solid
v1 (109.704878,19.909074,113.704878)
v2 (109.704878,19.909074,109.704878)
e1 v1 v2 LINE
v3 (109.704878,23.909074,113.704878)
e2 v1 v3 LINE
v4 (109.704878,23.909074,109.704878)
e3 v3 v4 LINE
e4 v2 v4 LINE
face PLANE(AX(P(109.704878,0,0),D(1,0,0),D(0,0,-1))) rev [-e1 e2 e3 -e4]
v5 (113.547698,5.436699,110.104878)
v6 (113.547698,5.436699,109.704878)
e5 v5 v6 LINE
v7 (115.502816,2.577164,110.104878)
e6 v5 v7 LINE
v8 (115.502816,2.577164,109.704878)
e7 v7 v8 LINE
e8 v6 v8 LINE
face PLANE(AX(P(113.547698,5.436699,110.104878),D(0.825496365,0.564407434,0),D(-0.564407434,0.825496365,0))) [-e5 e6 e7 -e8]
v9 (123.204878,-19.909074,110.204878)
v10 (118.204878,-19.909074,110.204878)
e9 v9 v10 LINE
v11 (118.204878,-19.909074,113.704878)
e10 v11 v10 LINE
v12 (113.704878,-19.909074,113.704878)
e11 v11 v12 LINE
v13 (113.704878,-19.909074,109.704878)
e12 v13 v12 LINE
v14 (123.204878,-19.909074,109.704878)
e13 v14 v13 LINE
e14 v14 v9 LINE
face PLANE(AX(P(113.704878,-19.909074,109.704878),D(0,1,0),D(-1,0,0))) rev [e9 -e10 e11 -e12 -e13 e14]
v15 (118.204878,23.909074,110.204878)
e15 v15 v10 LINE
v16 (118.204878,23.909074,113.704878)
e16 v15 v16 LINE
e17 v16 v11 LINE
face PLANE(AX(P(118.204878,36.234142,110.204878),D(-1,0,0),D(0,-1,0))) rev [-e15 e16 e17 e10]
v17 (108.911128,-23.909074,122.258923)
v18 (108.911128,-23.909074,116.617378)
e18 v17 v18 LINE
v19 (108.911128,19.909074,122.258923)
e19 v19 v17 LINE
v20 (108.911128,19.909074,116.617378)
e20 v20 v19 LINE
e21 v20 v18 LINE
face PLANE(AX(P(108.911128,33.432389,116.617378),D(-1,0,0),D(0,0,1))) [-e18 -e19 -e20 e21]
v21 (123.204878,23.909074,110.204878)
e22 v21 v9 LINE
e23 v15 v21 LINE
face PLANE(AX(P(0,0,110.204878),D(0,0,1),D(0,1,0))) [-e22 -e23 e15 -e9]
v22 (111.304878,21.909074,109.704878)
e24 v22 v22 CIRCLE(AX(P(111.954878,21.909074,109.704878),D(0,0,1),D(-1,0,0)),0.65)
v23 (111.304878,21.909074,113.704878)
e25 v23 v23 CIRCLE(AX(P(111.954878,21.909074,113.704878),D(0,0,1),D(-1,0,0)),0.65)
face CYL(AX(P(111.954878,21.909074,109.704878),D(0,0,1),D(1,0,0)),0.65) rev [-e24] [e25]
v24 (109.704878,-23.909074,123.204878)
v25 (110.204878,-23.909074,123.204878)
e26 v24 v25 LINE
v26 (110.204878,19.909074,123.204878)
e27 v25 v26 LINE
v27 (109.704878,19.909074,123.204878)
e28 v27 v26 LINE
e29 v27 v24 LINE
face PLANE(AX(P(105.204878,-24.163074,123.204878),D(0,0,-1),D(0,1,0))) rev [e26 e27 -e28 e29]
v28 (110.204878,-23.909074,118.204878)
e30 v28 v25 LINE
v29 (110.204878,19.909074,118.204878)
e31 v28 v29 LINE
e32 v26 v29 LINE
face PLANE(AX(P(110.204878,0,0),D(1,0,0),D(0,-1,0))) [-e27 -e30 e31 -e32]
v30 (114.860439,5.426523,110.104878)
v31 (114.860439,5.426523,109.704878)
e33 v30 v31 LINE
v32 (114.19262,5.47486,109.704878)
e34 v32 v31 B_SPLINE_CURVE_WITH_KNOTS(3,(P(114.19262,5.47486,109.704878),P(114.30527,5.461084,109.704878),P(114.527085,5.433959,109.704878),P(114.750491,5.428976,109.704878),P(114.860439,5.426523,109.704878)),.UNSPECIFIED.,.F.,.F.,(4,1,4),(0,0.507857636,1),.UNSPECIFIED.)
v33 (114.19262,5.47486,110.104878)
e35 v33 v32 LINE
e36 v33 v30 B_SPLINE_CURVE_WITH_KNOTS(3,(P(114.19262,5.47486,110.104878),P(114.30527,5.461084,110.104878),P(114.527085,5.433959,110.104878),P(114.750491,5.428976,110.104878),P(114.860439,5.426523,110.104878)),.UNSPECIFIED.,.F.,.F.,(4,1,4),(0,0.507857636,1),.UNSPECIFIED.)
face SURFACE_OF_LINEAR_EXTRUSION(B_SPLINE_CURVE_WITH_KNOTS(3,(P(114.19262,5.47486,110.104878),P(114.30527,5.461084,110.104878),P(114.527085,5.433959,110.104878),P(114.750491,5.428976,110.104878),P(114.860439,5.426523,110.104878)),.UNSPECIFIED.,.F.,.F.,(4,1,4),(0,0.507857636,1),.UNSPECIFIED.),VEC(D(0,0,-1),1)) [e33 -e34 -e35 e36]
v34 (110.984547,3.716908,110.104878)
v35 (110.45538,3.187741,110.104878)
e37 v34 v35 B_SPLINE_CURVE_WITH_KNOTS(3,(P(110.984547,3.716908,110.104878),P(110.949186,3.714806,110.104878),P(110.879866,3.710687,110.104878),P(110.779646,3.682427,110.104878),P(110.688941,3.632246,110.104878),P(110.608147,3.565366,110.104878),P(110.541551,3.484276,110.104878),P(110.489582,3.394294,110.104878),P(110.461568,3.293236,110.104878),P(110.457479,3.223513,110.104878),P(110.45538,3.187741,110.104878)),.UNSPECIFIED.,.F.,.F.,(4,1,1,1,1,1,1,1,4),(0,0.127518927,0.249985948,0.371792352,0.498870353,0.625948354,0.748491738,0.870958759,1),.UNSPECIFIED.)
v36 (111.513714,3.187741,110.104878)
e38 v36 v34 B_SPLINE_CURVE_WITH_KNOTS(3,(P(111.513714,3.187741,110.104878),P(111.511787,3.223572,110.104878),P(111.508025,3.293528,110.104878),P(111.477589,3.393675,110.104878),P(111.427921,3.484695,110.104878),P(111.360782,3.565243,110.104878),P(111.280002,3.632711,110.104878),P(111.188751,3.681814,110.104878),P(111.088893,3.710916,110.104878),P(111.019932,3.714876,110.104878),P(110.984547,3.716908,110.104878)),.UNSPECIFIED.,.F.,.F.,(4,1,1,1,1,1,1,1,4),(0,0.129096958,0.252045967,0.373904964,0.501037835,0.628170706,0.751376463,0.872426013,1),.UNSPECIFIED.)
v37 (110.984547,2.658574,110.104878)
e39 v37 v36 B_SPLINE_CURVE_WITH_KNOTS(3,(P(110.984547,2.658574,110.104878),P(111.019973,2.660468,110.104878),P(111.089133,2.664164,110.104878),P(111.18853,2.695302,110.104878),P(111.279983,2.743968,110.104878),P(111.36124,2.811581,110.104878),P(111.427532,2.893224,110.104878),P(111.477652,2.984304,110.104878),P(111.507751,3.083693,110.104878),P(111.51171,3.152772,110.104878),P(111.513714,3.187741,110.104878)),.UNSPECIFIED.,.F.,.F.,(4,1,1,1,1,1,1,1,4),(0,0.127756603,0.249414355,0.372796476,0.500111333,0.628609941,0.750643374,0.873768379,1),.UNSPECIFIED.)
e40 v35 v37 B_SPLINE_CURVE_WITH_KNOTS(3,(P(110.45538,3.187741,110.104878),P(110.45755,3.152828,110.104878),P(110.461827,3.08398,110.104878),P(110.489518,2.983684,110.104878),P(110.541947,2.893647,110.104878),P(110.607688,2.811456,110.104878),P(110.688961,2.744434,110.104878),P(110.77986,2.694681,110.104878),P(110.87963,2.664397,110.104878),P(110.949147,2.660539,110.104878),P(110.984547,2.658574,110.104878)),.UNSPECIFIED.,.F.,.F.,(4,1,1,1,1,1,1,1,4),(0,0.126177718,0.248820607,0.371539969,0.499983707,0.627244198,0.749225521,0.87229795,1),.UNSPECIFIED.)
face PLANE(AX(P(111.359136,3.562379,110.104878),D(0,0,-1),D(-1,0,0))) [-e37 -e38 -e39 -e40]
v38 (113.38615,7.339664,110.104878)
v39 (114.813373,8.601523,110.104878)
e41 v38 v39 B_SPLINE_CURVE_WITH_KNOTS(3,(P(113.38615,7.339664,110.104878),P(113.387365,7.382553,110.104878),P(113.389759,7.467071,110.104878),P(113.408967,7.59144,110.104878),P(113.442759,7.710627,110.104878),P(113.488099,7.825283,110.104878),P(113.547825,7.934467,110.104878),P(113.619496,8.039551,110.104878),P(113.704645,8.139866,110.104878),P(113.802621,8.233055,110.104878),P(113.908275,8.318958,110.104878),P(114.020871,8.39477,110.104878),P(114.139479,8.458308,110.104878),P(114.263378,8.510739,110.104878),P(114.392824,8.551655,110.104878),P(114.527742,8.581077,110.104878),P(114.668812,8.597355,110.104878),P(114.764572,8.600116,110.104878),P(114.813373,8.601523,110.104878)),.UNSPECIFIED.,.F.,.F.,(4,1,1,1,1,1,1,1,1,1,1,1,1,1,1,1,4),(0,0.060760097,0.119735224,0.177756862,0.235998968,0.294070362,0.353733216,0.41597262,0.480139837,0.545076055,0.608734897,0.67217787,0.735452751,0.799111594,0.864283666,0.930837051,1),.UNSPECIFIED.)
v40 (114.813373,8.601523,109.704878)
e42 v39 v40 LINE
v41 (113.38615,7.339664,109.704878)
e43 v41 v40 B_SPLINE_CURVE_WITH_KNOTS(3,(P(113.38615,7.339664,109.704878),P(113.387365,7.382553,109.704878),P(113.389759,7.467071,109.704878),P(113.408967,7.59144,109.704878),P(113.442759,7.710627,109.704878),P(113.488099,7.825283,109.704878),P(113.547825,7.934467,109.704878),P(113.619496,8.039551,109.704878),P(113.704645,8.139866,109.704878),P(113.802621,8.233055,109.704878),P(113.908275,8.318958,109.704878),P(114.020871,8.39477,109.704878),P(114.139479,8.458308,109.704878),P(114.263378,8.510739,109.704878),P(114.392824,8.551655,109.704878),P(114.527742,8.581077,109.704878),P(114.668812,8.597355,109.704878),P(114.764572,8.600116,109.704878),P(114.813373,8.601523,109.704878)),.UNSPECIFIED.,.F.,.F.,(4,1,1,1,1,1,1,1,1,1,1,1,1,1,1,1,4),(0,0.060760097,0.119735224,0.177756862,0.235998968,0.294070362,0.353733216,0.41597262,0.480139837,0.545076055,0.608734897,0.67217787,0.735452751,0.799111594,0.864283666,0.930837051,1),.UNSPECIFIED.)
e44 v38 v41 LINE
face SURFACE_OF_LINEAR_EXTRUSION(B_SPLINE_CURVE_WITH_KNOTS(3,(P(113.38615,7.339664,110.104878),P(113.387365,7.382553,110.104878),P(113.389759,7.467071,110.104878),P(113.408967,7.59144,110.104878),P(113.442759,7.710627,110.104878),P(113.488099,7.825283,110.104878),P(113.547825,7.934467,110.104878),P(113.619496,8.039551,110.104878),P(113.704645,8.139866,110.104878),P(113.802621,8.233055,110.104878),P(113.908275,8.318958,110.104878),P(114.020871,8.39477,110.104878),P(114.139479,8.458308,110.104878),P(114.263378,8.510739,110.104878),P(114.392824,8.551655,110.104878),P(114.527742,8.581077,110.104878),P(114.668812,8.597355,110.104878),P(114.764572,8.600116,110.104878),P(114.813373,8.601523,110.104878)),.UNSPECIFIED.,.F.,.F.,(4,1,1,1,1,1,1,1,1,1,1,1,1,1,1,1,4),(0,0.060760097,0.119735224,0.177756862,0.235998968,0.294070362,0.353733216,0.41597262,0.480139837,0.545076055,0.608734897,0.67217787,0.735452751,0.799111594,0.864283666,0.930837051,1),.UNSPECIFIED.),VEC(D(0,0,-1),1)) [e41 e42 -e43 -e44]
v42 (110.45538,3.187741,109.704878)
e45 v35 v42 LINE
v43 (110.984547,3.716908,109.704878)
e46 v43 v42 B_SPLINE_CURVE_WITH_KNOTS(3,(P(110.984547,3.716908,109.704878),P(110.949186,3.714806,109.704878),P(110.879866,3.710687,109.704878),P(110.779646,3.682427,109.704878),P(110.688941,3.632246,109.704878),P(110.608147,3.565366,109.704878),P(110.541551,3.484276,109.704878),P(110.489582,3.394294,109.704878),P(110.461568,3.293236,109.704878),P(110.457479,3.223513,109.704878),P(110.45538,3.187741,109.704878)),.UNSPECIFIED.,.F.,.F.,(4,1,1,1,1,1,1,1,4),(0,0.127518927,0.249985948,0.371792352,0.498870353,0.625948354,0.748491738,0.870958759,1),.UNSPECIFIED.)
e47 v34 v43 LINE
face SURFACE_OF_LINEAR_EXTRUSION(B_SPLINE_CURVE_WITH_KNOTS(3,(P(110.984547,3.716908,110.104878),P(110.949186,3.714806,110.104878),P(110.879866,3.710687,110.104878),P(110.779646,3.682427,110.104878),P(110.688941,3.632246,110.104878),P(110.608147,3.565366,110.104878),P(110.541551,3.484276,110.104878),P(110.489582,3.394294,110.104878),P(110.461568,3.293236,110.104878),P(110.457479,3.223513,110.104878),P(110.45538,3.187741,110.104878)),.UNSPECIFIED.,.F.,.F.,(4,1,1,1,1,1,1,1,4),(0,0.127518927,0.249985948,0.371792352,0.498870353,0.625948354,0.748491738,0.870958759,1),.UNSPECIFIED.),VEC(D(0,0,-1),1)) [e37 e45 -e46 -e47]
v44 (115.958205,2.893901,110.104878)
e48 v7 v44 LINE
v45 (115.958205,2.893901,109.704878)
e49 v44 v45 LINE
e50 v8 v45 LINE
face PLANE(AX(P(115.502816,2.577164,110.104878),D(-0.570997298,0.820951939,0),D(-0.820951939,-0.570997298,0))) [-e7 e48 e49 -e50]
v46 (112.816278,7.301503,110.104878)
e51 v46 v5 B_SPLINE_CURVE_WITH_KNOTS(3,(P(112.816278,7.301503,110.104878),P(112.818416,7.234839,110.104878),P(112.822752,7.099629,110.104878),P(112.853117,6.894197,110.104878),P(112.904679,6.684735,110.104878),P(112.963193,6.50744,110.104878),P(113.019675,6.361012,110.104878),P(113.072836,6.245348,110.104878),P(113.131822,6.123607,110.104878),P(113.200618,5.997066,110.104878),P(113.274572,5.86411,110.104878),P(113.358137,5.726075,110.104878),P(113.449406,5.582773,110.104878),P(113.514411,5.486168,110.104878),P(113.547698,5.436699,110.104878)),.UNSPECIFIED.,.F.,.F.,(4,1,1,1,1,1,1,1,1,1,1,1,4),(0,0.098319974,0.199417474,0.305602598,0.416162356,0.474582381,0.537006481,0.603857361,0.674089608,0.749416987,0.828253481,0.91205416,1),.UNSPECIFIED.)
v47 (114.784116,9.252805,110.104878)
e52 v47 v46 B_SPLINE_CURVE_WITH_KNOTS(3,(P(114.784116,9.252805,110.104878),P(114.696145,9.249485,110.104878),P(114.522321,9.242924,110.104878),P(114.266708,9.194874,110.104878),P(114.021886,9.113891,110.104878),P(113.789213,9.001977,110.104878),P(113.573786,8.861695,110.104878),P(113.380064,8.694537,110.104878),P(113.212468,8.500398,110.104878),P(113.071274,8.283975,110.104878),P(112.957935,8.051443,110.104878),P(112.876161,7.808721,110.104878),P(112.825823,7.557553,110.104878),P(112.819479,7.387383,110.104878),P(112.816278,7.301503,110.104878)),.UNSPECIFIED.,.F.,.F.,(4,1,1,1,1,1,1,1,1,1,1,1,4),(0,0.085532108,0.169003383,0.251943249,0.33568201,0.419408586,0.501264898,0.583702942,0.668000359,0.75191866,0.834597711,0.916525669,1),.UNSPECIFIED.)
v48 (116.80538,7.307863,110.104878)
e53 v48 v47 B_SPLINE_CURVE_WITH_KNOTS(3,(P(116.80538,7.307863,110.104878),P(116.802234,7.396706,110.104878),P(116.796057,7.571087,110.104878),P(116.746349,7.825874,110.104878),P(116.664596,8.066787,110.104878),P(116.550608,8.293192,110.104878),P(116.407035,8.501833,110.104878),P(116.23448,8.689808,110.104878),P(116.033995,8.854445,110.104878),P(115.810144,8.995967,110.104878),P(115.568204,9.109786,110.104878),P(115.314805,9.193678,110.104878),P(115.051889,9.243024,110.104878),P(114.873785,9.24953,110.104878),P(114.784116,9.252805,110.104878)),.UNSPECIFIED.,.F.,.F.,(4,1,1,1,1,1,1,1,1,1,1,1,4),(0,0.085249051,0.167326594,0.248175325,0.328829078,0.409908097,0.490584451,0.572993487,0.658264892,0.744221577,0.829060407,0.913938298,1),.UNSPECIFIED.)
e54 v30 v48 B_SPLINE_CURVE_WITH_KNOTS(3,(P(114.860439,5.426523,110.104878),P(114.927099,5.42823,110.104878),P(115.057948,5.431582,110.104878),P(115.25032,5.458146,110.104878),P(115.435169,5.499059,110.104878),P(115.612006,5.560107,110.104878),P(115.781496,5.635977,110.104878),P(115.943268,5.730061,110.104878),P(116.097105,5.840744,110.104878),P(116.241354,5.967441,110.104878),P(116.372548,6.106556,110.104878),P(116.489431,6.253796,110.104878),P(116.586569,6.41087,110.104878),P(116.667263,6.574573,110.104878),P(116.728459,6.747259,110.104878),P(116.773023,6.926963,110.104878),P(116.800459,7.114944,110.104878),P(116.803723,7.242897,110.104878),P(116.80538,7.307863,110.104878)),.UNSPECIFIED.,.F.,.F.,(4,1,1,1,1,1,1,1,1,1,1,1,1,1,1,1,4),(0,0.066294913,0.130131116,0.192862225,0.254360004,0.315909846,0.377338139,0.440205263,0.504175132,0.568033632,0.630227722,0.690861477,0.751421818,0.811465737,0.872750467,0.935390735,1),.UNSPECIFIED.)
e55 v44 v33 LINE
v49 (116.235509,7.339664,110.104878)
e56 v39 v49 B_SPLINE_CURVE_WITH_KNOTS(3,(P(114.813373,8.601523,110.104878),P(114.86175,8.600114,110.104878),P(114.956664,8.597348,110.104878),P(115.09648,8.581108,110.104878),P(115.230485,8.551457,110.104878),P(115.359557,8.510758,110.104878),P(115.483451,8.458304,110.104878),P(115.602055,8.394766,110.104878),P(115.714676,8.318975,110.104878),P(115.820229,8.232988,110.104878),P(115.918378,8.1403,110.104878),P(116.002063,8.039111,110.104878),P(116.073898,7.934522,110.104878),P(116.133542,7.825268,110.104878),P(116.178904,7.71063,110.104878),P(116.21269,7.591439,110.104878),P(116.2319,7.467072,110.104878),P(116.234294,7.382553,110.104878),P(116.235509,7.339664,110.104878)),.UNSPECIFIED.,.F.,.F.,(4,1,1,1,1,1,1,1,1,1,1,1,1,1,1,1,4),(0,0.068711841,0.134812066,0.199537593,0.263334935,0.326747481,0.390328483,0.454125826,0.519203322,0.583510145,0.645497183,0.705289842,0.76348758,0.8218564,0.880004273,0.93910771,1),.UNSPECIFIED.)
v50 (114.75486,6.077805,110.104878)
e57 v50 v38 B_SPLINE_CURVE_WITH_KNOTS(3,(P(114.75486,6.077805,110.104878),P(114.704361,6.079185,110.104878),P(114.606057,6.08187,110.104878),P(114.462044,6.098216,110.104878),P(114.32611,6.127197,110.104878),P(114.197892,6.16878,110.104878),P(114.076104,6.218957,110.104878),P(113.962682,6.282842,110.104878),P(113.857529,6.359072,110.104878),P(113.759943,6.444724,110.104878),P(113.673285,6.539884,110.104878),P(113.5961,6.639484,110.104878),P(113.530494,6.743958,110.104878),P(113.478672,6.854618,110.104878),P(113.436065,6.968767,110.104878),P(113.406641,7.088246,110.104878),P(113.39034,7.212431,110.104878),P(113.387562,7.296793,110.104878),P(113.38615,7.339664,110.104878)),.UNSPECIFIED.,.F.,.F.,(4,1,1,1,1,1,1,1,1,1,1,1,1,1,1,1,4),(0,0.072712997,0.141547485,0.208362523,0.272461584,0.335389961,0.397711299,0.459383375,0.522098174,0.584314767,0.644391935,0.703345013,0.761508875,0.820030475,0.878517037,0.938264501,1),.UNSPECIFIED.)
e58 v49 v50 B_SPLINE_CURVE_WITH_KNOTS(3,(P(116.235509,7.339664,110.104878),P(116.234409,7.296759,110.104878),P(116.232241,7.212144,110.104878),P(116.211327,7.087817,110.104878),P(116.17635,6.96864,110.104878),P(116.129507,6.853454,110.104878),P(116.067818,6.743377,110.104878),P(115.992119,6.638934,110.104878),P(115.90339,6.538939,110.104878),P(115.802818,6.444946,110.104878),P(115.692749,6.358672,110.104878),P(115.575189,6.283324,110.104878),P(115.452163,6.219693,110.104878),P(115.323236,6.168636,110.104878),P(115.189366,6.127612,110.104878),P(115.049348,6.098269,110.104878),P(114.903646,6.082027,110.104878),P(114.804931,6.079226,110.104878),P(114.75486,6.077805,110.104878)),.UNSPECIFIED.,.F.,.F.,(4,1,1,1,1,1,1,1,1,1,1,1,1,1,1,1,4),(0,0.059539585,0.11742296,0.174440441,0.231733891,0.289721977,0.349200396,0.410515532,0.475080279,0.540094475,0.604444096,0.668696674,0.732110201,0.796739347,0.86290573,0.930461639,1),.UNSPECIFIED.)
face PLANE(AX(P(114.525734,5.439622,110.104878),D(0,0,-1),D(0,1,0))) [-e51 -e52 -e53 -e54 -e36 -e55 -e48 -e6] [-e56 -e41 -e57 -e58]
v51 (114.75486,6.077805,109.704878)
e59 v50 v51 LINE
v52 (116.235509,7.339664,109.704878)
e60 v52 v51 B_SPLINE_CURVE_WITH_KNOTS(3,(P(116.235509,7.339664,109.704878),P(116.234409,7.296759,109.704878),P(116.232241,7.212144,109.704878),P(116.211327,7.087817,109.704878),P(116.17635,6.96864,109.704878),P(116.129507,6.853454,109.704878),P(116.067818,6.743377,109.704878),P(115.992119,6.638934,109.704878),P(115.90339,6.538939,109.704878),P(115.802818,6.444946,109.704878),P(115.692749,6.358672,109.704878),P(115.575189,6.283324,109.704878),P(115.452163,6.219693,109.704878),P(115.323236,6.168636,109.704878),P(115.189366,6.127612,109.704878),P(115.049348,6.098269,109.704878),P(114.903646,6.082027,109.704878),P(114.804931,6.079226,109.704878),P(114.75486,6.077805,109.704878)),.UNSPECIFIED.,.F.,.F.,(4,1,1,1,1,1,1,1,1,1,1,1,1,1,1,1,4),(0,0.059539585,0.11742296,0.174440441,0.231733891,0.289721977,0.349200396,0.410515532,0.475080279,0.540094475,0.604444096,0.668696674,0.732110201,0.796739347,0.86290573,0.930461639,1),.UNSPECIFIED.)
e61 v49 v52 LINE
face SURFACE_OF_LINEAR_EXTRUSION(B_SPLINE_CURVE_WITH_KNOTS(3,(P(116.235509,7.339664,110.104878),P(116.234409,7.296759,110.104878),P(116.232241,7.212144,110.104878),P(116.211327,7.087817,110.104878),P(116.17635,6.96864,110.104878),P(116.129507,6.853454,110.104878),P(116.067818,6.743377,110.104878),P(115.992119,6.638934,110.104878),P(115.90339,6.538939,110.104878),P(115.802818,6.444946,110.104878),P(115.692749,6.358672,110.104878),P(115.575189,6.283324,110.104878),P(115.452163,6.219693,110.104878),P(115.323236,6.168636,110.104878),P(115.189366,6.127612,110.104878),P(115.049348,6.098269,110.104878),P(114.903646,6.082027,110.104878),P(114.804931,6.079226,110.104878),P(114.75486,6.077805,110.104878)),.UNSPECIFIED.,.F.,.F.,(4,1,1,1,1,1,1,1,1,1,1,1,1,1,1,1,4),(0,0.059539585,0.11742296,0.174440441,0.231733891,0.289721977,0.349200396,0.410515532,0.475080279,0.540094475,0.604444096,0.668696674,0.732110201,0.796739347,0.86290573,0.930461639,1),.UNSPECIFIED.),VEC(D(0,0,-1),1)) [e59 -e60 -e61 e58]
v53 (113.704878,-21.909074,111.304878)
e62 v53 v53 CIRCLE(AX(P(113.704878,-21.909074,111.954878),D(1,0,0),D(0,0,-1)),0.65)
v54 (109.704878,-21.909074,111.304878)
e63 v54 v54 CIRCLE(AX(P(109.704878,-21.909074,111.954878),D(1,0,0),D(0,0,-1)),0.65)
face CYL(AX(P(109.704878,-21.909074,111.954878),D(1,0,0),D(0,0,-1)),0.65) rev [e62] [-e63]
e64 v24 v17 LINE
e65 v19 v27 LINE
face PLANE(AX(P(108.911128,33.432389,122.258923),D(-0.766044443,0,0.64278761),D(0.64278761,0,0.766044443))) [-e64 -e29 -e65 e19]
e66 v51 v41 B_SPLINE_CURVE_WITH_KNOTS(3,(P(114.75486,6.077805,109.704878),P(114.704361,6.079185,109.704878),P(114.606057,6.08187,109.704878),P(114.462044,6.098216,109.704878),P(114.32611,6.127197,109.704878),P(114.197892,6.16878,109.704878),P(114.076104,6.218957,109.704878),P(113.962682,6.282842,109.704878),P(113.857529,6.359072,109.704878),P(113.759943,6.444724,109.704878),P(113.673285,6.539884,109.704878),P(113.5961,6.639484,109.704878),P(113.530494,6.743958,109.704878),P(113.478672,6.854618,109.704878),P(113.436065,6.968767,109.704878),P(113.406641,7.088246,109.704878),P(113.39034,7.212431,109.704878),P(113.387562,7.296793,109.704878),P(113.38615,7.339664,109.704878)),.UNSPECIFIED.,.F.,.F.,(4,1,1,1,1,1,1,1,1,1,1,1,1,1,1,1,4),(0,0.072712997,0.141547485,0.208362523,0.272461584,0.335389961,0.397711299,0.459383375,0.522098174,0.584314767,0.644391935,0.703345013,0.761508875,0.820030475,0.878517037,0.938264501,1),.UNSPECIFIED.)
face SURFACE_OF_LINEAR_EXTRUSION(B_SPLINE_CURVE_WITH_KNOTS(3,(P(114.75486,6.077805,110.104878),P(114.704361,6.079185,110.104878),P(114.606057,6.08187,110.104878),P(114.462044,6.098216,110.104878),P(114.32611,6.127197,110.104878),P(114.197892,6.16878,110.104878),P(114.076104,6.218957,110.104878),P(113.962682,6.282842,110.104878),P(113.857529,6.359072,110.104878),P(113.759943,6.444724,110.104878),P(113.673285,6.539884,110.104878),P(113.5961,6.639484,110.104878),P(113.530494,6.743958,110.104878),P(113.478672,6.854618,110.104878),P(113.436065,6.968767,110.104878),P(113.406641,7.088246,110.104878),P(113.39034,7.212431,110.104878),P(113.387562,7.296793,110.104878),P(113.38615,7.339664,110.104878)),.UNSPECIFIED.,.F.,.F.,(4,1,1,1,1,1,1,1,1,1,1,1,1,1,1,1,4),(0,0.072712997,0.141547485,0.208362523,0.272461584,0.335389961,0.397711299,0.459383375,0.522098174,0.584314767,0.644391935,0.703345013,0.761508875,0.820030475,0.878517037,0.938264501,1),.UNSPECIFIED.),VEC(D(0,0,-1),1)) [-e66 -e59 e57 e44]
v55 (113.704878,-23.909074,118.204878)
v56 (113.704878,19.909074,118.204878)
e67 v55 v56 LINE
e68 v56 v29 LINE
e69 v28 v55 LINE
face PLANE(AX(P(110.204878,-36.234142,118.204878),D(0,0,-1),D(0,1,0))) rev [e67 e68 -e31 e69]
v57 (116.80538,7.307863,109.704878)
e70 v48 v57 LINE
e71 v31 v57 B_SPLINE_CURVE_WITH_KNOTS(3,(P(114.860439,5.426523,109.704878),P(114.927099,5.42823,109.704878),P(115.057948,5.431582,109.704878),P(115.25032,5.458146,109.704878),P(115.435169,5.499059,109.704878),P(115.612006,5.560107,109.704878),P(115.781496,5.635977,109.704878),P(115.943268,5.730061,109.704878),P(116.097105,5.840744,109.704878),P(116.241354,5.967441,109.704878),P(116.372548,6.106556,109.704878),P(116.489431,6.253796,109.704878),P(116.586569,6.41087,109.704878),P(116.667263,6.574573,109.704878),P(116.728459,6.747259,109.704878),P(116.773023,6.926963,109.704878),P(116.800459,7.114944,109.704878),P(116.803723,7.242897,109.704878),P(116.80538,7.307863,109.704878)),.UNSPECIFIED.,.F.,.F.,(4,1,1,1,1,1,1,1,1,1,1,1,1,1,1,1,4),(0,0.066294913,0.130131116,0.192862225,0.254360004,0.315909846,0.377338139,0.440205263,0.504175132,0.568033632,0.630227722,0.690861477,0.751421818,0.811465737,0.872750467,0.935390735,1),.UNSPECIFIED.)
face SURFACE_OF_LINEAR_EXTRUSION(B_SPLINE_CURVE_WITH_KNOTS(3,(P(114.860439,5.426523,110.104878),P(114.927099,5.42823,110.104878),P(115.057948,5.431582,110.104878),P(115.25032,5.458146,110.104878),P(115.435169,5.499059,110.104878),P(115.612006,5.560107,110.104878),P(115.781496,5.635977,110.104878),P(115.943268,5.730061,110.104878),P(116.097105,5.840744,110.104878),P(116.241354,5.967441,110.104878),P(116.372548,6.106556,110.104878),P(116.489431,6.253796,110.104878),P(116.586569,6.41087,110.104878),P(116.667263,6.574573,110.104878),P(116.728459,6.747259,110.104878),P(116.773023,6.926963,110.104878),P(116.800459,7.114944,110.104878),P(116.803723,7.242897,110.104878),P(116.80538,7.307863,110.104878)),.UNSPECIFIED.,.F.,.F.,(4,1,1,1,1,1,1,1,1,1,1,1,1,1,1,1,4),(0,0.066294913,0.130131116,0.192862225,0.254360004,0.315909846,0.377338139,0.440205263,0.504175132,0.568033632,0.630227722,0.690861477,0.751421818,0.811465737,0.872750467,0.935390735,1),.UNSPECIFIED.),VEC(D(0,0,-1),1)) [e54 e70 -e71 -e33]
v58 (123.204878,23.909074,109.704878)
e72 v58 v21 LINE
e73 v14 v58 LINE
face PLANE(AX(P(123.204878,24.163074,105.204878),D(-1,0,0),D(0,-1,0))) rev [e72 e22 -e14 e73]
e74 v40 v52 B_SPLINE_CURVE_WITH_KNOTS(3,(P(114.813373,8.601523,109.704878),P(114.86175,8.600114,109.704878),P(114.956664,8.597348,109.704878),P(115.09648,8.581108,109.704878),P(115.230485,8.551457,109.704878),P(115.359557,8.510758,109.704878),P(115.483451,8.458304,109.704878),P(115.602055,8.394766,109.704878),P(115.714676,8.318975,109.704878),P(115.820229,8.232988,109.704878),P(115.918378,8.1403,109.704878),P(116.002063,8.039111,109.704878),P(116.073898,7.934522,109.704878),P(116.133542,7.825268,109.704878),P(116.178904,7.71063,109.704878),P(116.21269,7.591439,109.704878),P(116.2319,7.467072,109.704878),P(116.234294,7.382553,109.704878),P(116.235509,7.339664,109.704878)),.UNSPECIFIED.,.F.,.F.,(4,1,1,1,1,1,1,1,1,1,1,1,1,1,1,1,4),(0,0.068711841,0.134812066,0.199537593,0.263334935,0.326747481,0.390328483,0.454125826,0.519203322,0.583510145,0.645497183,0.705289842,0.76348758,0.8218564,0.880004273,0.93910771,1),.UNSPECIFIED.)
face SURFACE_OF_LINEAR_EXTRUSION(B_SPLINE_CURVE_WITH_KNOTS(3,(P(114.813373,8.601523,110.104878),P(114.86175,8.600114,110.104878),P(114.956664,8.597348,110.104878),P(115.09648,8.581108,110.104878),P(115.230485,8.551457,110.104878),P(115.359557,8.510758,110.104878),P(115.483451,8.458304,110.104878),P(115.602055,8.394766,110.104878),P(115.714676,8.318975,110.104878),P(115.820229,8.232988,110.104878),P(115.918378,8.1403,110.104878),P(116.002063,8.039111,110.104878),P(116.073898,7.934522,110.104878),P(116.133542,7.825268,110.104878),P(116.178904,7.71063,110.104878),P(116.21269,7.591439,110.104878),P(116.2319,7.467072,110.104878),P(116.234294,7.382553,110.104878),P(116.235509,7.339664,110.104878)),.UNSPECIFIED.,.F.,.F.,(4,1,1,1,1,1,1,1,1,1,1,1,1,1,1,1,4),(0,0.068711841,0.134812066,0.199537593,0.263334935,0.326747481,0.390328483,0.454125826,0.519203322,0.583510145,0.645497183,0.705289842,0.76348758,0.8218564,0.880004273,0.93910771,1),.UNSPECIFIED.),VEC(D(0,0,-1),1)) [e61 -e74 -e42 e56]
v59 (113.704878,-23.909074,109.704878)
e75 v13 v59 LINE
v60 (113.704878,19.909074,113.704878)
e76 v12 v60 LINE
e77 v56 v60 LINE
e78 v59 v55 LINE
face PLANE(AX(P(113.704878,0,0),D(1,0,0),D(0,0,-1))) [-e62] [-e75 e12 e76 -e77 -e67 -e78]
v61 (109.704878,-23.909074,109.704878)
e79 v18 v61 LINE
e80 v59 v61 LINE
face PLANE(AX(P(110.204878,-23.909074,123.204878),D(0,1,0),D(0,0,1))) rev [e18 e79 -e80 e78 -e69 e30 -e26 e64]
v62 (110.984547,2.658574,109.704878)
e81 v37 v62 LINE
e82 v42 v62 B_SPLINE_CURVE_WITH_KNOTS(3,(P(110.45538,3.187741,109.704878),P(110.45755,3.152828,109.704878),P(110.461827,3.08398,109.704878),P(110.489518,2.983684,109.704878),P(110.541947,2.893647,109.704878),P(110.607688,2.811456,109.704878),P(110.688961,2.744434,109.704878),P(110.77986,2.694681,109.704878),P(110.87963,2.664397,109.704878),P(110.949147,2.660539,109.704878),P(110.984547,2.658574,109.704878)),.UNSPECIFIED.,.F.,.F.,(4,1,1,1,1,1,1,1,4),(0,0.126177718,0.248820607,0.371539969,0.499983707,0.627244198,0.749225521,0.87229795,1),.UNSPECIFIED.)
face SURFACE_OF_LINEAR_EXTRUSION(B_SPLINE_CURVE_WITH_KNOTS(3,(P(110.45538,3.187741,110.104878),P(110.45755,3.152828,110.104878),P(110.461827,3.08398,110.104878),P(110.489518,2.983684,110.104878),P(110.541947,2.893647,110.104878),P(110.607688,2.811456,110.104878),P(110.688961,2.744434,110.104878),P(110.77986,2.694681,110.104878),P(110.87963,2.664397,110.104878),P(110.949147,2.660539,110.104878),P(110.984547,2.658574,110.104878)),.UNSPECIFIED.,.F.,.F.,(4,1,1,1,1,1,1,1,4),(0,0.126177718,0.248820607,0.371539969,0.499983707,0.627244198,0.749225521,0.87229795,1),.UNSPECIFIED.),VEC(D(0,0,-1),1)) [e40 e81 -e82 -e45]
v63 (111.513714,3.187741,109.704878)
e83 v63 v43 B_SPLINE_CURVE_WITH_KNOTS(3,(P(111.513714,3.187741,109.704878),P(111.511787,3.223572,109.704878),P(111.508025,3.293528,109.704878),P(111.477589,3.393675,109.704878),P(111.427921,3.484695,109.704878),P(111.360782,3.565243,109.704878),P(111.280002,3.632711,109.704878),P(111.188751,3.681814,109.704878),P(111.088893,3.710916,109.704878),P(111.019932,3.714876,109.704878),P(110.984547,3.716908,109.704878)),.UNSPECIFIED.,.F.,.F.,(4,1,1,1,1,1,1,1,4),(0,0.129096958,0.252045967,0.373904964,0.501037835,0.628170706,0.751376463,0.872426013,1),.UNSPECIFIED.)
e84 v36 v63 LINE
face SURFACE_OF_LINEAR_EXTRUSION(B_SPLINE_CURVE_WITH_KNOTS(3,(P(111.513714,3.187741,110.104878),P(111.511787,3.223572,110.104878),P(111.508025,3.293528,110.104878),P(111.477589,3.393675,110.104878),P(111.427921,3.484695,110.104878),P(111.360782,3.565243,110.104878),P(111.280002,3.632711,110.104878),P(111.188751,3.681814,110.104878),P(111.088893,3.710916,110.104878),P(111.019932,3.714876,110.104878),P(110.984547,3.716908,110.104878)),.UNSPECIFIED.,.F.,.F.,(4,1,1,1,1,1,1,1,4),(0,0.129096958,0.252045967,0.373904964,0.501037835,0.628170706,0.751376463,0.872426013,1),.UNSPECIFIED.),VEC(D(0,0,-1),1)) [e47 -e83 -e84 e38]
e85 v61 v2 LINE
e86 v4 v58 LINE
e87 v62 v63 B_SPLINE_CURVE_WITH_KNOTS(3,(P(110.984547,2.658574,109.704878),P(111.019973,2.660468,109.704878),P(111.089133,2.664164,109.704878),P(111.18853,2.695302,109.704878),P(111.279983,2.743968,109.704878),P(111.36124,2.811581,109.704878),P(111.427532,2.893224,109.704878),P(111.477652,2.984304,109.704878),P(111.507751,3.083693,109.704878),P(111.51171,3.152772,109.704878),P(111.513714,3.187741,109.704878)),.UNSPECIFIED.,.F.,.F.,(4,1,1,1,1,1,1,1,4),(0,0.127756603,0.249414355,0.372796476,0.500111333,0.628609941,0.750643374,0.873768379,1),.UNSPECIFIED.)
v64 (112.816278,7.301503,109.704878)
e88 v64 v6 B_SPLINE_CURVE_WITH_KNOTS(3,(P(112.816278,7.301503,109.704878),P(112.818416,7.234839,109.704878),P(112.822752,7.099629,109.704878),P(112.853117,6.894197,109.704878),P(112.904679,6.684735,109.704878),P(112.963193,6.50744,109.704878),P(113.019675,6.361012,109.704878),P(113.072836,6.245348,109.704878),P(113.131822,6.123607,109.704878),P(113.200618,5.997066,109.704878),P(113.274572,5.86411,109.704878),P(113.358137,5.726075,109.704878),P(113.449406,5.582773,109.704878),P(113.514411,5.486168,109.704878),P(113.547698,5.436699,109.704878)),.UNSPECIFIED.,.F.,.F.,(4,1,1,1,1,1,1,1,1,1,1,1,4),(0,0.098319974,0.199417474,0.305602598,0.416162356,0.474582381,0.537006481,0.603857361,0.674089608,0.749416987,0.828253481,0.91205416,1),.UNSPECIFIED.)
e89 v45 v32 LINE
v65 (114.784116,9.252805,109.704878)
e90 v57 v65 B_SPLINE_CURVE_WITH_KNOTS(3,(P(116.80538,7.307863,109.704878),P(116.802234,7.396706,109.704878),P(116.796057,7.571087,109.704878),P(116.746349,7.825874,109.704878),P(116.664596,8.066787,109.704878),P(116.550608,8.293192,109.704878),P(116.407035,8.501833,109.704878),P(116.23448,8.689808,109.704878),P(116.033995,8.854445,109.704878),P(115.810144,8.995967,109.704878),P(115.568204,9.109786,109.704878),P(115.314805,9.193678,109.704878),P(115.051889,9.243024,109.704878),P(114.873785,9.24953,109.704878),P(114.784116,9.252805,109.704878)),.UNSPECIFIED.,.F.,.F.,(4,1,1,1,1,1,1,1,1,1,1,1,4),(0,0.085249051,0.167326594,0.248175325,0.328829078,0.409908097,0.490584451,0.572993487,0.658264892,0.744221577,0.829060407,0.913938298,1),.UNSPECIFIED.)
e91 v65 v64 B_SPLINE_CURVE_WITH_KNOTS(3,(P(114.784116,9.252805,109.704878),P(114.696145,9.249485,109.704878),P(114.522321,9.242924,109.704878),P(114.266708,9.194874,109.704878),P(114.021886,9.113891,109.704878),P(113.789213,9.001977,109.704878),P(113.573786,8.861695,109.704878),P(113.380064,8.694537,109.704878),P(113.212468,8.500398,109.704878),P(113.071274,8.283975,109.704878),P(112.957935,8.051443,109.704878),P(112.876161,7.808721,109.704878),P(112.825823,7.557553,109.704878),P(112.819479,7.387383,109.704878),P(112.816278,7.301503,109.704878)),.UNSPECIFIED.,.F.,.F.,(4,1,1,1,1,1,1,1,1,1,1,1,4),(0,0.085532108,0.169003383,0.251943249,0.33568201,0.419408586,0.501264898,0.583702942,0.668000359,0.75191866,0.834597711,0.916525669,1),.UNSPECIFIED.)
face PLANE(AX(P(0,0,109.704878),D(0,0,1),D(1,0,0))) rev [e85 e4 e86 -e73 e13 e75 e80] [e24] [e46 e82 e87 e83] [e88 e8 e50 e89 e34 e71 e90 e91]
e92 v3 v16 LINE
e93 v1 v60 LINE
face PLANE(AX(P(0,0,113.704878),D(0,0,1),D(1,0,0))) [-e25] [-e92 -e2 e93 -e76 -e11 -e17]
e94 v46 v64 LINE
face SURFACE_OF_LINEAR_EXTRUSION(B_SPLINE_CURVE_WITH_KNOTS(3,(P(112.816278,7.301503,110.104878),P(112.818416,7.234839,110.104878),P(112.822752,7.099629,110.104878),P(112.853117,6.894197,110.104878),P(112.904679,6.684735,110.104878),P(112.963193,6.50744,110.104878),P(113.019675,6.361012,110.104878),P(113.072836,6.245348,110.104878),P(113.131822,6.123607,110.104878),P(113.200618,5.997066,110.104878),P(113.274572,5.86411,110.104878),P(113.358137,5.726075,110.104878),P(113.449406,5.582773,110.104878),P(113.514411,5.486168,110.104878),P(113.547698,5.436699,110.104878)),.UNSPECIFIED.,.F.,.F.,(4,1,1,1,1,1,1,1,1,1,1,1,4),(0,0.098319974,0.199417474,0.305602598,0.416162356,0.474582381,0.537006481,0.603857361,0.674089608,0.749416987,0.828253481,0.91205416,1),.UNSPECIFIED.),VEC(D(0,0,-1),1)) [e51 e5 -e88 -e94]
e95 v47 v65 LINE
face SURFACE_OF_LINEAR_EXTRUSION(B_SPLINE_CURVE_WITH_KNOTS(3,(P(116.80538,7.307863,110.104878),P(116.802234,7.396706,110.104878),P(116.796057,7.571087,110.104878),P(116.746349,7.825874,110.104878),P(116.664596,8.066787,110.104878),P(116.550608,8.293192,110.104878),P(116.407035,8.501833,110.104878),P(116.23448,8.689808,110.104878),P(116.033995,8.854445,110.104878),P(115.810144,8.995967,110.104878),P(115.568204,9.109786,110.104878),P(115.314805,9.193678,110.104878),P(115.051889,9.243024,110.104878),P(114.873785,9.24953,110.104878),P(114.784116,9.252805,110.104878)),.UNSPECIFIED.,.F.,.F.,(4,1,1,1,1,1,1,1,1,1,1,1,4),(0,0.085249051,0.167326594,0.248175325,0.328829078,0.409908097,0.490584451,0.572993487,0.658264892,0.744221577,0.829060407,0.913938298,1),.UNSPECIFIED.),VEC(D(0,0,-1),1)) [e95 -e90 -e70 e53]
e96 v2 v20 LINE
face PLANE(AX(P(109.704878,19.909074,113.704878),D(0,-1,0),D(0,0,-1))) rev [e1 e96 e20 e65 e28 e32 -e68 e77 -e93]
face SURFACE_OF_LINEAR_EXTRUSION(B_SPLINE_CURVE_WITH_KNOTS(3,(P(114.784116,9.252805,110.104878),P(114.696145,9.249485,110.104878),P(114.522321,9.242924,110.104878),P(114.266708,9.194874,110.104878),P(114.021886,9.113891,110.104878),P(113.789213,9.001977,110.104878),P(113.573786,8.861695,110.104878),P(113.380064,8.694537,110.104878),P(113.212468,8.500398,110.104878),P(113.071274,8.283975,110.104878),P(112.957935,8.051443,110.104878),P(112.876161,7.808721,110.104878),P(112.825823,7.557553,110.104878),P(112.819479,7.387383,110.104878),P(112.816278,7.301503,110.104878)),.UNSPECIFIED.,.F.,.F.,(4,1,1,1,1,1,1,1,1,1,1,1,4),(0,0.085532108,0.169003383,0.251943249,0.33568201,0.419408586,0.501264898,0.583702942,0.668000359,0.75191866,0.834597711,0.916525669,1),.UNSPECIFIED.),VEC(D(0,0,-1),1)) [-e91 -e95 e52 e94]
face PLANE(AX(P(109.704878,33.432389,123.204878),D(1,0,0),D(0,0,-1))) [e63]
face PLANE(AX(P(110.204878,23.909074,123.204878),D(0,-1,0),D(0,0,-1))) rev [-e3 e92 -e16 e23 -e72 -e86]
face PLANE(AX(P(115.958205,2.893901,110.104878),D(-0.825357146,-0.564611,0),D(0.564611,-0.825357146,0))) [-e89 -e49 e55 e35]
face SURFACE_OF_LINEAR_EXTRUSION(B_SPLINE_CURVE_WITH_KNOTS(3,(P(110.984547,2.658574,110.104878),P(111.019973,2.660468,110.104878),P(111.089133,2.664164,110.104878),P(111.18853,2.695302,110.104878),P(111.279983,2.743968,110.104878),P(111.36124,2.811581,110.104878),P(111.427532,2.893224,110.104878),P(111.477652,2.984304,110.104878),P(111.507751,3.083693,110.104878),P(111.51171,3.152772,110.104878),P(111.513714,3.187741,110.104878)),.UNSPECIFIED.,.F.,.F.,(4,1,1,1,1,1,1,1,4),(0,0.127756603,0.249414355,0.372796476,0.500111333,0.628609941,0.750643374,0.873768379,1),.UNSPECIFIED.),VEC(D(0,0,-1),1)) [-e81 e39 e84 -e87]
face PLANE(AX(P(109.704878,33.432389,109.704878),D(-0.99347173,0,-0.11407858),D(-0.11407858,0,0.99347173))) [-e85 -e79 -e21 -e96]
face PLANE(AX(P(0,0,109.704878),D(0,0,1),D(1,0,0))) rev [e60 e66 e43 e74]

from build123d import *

# Parameters (mm, degrees)
STOCK_GOUX_START         = -23.909074226
STOCK_GOUX_LIKED_1_DEPTH = 47.818148452
SKETCH2_W                = 9.499999796
SKETCH2_H                = 4
CUT_EXTRUDE1_DEPTH       = 126.862368241
SKETCH4_R                = 0.64999997
CUT_EXTRUDE2_DEPTH       = 126.862368241
CIRPATTERN1_COUNT        = 2
CUT_EXTRUDE3_DEPTH       = 0.4
BOSS_EXTRUDE1_DEPTH      = 43.818148451


# Read off the part's stored shape, not the designer's step: Stock-Goux Liked-1
with BuildPart() as part:
    # Stock-Goux Liked-1 outline → Stock-Goux Liked-1 (new body)
    with BuildSketch(Plane(origin=(0, 0, 0), x_dir=(1, 0, 0), z_dir=(0, 1, 0)).offset(STOCK_GOUX_START)):
        Polygon((118.20487789, -113.704878), (118.20487789, -110.204877888), (123.204877796, -110.204877888), (123.204877796, -109.704877872), (109.704877872, -109.704877872), (109.704877872, -123.204877796), (110.204877888, -123.204877796), (110.204877888, -118.20487789), (113.704878, -118.20487789), (113.704878, -113.704878), align=None)
    extrude(amount=STOCK_GOUX_LIKED_1_DEPTH)

    # Sketch2 → Cut-Extrude1 (cut, through all)
    with BuildSketch(Plane.XY.offset(113.704878)):
        with Locations((118.454877898, -21.909074226)):
            Rectangle(SKETCH2_W, SKETCH2_H)
    cut_extrude1 = extrude(amount=-CUT_EXTRUDE1_DEPTH, mode=Mode.SUBTRACT)

    # Sketch4 → Cut-Extrude2 (cut, through all)
    with BuildSketch(Plane(origin=(113.704878, 0, 0), x_dir=(0, 0, -1), z_dir=(1, 0, 0))):
        with Locations((-111.954877944, -21.909074226)):
            Circle(SKETCH4_R)
    cut_extrude2 = extrude(amount=-CUT_EXTRUDE2_DEPTH, mode=Mode.SUBTRACT)

    # CirPattern1: Cut-Extrude1, Cut-Extrude2 ×2 about axis
    cirpattern1_axis = Axis((109.279877871, 0, 109.279877871), (0.7071067811865481, 0, 0.707106781186547))
    add([cut_extrude1.rotate(cirpattern1_axis, i * 360 / CIRPATTERN1_COUNT) for i in range(1, CIRPATTERN1_COUNT)], mode=Mode.SUBTRACT)
    add([cut_extrude2.rotate(cirpattern1_axis, i * 360 / CIRPATTERN1_COUNT) for i in range(1, CIRPATTERN1_COUNT)], mode=Mode.SUBTRACT)

    # Sketch5 → Cut-Extrude3 (cut)
    # profile 1 of 2: a face of its own
    with BuildSketch(Plane(origin=(0, 0, 109.704877872), x_dir=(-1, 0, 0), z_dir=(0, 0, -1))):
        with BuildLine():
            Line((-115.502816358, 2.577164082), (-115.958204979, 2.893900861))
            Line((-115.958204979, 2.893900861), (-114.192620044, 5.474860396))
            add(Edge.make_bspline(
                [(-114.192620044, 5.474860396), (-114.305270378, 5.46108441), (-114.527085168, 5.433958724), (-114.750491053, 5.428975508), (-114.860438553, 5.426523056)],
                knots=[0, 0, 0, 0, 1.015715272, 2, 2, 2, 2], degree=3))
            add(Edge.make_bspline(
                [(-114.860438553, 5.426523056), (-114.927099126, 5.428230438), (-115.057948, 5.431581878), (-115.250319712, 5.458146302), (-115.435169229, 5.499058677), (-115.61200649, 5.560107132), (-115.781496163, 5.635977312), (-115.943268243, 5.730060751), (-116.097104958, 5.840743594), (-116.241354116, 5.967440593), (-116.372548271, 6.106556488), (-116.48943054, 6.253796012), (-116.586569451, 6.410869558), (-116.667262684, 6.574572957), (-116.728459364, 6.747259122), (-116.773022825, 6.926963034), (-116.800459097, 7.114944155), (-116.80372317, 7.242896893), (-116.80538046, 7.3078632)],
                knots=[0, 0, 0, 0, 1.060718605, 2.082097864, 3.085795603, 4.069760067, 5.054557537, 6.03741023, 7.043284206, 8.066802108, 9.088538119, 10.083643548, 11.053783639, 12.022749082, 12.983451788, 13.964007469, 14.966251758, 16, 16, 16, 16], degree=3))
            add(Edge.make_bspline(
                [(-116.80538046, 7.3078632), (-116.8022337, 7.396706327), (-116.796057248, 7.571087363), (-116.746348509, 7.825874344), (-116.66459618, 8.066787073), (-116.550607553, 8.293192139), (-116.407034559, 8.501832709), (-116.234480402, 8.689808329), (-116.033994639, 8.854445421), (-115.810144404, 8.995967104), (-115.568203923, 9.109786313), (-115.314805072, 9.193677615), (-115.051889454, 9.243023915), (-114.873785253, 9.249529692), (-114.784116438, 9.252805107)],
                knots=[0, 0, 0, 0, 1.022988612, 2.007919123, 2.978103895, 3.94594894, 4.918897164, 5.887013414, 6.875921846, 7.89917871, 8.930658928, 9.948724884, 10.967259574, 12, 12, 12, 12], degree=3))
            add(Edge.make_bspline(
                [(-114.784116438, 9.252805107), (-114.696144591, 9.249484669), (-114.522320513, 9.242923795), (-114.266707601, 9.194874308), (-114.021886042, 9.11389063), (-113.789212994, 9.001977207), (-113.573785775, 8.861694989), (-113.380063946, 8.694536639), (-113.212468325, 8.50039804), (-113.07127357, 8.283974636), (-112.957935069, 8.051443113), (-112.876161069, 7.808720854), (-112.825822553, 7.557553459), (-112.819479217, 7.387383485), (-112.816277896, 7.301503024)],
                knots=[0, 0, 0, 0, 1.026385292, 2.028040595, 3.023318987, 4.028184125, 5.03290303, 6.015178782, 7.004435299, 8.016004309, 9.023023918, 10.015172535, 10.998308025, 12, 12, 12, 12], degree=3))
            add(Edge.make_bspline(
                [(-112.816277896, 7.301503024), (-112.818415867, 7.234839332), (-112.822752205, 7.099628708), (-112.853116648, 6.894196515), (-112.904678984, 6.684734999), (-112.96319278, 6.507440104), (-113.019675427, 6.361011916), (-113.072836052, 6.245348335), (-113.131822387, 6.123607472), (-113.200617862, 5.997065873), (-113.274572315, 5.864110417), (-113.358137002, 5.726074632), (-113.449405682, 5.582773288), (-113.514411031, 5.486167857), (-113.547698169, 5.436699338)],
                knots=[0, 0, 0, 0, 1.179839688, 2.393009684, 3.667231171, 4.993948276, 5.694988576, 6.444077775, 7.246288328, 8.089075292, 8.993003841, 9.939041771, 10.944649915, 12, 12, 12, 12], degree=3))
            Line((-113.547698169, 5.436699338), (-115.502816358, 2.577164082))
        make_face()
        with BuildLine():
            add(Edge.make_bspline(
                [(-114.754859627, 6.077805107), (-114.704360773, 6.079184661), (-114.606056671, 6.081870182), (-114.462043571, 6.098215521), (-114.32610966, 6.127196896), (-114.197891822, 6.168779802), (-114.076104442, 6.218956901), (-113.962681961, 6.282841505), (-113.857529453, 6.359071685), (-113.759942786, 6.444724142), (-113.673285243, 6.539884487), (-113.59610003, 6.639483523), (-113.530494429, 6.743958458), (-113.478672484, 6.854617663), (-113.436064754, 6.968767455), (-113.406640647, 7.088246071), (-113.390340499, 7.212431027), (-113.387561785, 7.296792878), (-113.386149691, 7.339664082)],
                knots=[0, 0, 0, 0, 1.163407946, 2.26475976, 3.333800367, 4.359385343, 5.366239384, 6.363380779, 7.350133999, 8.353570782, 9.349036268, 10.310270964, 11.253520213, 12.184142, 13.120487599, 14.056272588, 15.012232024, 16, 16, 16, 16], degree=3))
            add(Edge.make_bspline(
                [(-113.386149691, 7.339664082), (-113.387364662, 7.382553189), (-113.389758912, 7.467071435), (-113.408967299, 7.591440248), (-113.442758775, 7.710626593), (-113.488098654, 7.825282973), (-113.547825371, 7.934467362), (-113.619495981, 8.039550558), (-113.704644854, 8.139866276), (-113.802620939, 8.233055217), (-113.908275056, 8.318957834), (-114.020870535, 8.394769715), (-114.139479312, 8.458308171), (-114.263377772, 8.510739159), (-114.392824062, 8.551654524), (-114.527741583, 8.581077457), (-114.668812105, 8.597354783), (-114.764572438, 8.600115935), (-114.813373249, 8.601523056)],
                knots=[0, 0, 0, 0, 0.972161553, 1.915763587, 2.844109794, 3.775983486, 4.705125789, 5.659731448, 6.655561913, 7.682237399, 8.721216875, 9.739758359, 10.754845918, 11.767244016, 12.7857855, 13.828538656, 14.893392813, 16, 16, 16, 16], degree=3))
            add(Edge.make_bspline(
                [(-114.813373249, 8.601523056), (-114.861749641, 8.600113661), (-114.956663725, 8.597348441), (-115.096480128, 8.581108397), (-115.23048539, 8.551456647), (-115.359556615, 8.510758112), (-115.483451394, 8.45830426), (-115.602054576, 8.394766386), (-115.714676392, 8.318975285), (-115.820229214, 8.232987627), (-115.918378301, 8.14030004), (-116.00206319, 8.039111105), (-116.073897823, 7.934522025), (-116.133542471, 7.825268446), (-116.17890418, 7.71063047), (-116.212689812, 7.591439198), (-116.231899769, 7.467071708), (-116.234293803, 7.382553281), (-116.235508665, 7.339664082)],
                knots=[0, 0, 0, 0, 1.099389452, 2.15699305, 3.192601482, 4.213358962, 5.227959689, 6.245255729, 7.266013209, 8.307253147, 9.336162325, 10.327954924, 11.284637477, 12.215801273, 13.149702402, 14.080068371, 15.025723358, 16, 16, 16, 16], degree=3))
            add(Edge.make_bspline(
                [(-116.235508665, 7.339664082), (-116.234409342, 7.296759493), (-116.232241276, 7.21214379), (-116.211326572, 7.087817334), (-116.176350264, 6.968640183), (-116.129506512, 6.853453528), (-116.067817913, 6.743377443), (-115.992118932, 6.638933801), (-115.903390298, 6.538938627), (-115.802818114, 6.444945542), (-115.692748736, 6.35867231), (-115.575188925, 6.283324331), (-115.452162507, 6.219692896), (-115.323236405, 6.168636385), (-115.189366068, 6.127612367), (-115.04934833, 6.098268935), (-114.903646242, 6.082026965), (-114.804930989, 6.079225895), (-114.754859627, 6.077805107)],
                knots=[0, 0, 0, 0, 0.952633368, 1.87876736, 2.791047057, 3.707742249, 4.635551637, 5.587206343, 6.568248508, 7.601284464, 8.641511608, 9.671105535, 10.699146789, 11.713763218, 12.747829548, 13.806491675, 14.887386225, 16, 16, 16, 16], degree=3))
        make_face(mode=Mode.SUBTRACT)
    # profile 2 of 2: a face of its own
    with BuildSketch(Plane(origin=(0, 0, 109.704877872), x_dir=(-1, 0, 0), z_dir=(0, 0, -1))):
        with BuildLine():
            add(Edge.make_bspline(
                [(-110.984547127, 3.716907671), (-110.949186313, 3.714806426), (-110.879865572, 3.710687181), (-110.779646011, 3.682426644), (-110.688941414, 3.632245931), (-110.608147199, 3.565366319), (-110.541551163, 3.484275616), (-110.489582124, 3.394294467), (-110.461567765, 3.293235864), (-110.457478525, 3.223513453), (-110.45538046, 3.187741005)],
                knots=[0, 0, 0, 0, 1.020151414, 1.999887582, 2.974338812, 3.990962822, 5.007586832, 5.987933904, 6.967670073, 8, 8, 8, 8], degree=3))
            add(Edge.make_bspline(
                [(-110.45538046, 3.187741005), (-110.457549622, 3.152828107), (-110.461827176, 3.083980384), (-110.489517908, 2.983684016), (-110.541947227, 2.893646632), (-110.607687857, 2.81145561), (-110.688961387, 2.744434316), (-110.779860451, 2.694680534), (-110.879630305, 2.664396513), (-110.949147063, 2.660538803), (-110.984547127, 2.658574338)],
                knots=[0, 0, 0, 0, 1.009421747, 1.99056486, 2.972319754, 3.999869655, 5.017953583, 5.993804169, 6.978383603, 8, 8, 8, 8], degree=3))
            add(Edge.make_bspline(
                [(-110.984547127, 2.658574338), (-111.019972699, 2.660467722), (-111.089132694, 2.664164102), (-111.188530141, 2.695302336), (-111.279982784, 2.743967757), (-111.361240489, 2.811580579), (-111.427531716, 2.893223696), (-111.477652054, 2.984304098), (-111.507751324, 3.083693277), (-111.511709865, 3.152771558), (-111.513713794, 3.187741005)],
                knots=[0, 0, 0, 0, 1.022052826, 1.995314843, 2.982371812, 4.00089066, 5.028879526, 6.005146991, 6.990147033, 8, 8, 8, 8], degree=3))
            add(Edge.make_bspline(
                [(-111.513713794, 3.187741005), (-111.511786842, 3.223572022), (-111.508024706, 3.293527686), (-111.477588865, 3.393674638), (-111.427920595, 3.484694521), (-111.360782235, 3.565242602), (-111.280002441, 3.632710994), (-111.188750755, 3.681814262), (-111.088893303, 3.710916152), (-111.019932415, 3.714875861), (-110.984547127, 3.716907671)],
                knots=[0, 0, 0, 0, 1.032775665, 2.016367738, 2.991239715, 4.008302682, 5.025365648, 6.011011707, 6.979408107, 8, 8, 8, 8], degree=3))
        make_face()
    extrude(amount=-CUT_EXTRUDE3_DEPTH, mode=Mode.SUBTRACT)

    # Sketch6 → Boss-Extrude1 (add)
    with BuildSketch(Plane.XZ.offset(23.909074226)):
        Polygon((109.704877872, 109.704877872), (108.911127872, 116.61737789), (108.911127872, 122.258923382), (109.704877872, 123.204877796), align=None)
    extrude(amount=-BOSS_EXTRUDE1_DEPTH)


solid = part.part
